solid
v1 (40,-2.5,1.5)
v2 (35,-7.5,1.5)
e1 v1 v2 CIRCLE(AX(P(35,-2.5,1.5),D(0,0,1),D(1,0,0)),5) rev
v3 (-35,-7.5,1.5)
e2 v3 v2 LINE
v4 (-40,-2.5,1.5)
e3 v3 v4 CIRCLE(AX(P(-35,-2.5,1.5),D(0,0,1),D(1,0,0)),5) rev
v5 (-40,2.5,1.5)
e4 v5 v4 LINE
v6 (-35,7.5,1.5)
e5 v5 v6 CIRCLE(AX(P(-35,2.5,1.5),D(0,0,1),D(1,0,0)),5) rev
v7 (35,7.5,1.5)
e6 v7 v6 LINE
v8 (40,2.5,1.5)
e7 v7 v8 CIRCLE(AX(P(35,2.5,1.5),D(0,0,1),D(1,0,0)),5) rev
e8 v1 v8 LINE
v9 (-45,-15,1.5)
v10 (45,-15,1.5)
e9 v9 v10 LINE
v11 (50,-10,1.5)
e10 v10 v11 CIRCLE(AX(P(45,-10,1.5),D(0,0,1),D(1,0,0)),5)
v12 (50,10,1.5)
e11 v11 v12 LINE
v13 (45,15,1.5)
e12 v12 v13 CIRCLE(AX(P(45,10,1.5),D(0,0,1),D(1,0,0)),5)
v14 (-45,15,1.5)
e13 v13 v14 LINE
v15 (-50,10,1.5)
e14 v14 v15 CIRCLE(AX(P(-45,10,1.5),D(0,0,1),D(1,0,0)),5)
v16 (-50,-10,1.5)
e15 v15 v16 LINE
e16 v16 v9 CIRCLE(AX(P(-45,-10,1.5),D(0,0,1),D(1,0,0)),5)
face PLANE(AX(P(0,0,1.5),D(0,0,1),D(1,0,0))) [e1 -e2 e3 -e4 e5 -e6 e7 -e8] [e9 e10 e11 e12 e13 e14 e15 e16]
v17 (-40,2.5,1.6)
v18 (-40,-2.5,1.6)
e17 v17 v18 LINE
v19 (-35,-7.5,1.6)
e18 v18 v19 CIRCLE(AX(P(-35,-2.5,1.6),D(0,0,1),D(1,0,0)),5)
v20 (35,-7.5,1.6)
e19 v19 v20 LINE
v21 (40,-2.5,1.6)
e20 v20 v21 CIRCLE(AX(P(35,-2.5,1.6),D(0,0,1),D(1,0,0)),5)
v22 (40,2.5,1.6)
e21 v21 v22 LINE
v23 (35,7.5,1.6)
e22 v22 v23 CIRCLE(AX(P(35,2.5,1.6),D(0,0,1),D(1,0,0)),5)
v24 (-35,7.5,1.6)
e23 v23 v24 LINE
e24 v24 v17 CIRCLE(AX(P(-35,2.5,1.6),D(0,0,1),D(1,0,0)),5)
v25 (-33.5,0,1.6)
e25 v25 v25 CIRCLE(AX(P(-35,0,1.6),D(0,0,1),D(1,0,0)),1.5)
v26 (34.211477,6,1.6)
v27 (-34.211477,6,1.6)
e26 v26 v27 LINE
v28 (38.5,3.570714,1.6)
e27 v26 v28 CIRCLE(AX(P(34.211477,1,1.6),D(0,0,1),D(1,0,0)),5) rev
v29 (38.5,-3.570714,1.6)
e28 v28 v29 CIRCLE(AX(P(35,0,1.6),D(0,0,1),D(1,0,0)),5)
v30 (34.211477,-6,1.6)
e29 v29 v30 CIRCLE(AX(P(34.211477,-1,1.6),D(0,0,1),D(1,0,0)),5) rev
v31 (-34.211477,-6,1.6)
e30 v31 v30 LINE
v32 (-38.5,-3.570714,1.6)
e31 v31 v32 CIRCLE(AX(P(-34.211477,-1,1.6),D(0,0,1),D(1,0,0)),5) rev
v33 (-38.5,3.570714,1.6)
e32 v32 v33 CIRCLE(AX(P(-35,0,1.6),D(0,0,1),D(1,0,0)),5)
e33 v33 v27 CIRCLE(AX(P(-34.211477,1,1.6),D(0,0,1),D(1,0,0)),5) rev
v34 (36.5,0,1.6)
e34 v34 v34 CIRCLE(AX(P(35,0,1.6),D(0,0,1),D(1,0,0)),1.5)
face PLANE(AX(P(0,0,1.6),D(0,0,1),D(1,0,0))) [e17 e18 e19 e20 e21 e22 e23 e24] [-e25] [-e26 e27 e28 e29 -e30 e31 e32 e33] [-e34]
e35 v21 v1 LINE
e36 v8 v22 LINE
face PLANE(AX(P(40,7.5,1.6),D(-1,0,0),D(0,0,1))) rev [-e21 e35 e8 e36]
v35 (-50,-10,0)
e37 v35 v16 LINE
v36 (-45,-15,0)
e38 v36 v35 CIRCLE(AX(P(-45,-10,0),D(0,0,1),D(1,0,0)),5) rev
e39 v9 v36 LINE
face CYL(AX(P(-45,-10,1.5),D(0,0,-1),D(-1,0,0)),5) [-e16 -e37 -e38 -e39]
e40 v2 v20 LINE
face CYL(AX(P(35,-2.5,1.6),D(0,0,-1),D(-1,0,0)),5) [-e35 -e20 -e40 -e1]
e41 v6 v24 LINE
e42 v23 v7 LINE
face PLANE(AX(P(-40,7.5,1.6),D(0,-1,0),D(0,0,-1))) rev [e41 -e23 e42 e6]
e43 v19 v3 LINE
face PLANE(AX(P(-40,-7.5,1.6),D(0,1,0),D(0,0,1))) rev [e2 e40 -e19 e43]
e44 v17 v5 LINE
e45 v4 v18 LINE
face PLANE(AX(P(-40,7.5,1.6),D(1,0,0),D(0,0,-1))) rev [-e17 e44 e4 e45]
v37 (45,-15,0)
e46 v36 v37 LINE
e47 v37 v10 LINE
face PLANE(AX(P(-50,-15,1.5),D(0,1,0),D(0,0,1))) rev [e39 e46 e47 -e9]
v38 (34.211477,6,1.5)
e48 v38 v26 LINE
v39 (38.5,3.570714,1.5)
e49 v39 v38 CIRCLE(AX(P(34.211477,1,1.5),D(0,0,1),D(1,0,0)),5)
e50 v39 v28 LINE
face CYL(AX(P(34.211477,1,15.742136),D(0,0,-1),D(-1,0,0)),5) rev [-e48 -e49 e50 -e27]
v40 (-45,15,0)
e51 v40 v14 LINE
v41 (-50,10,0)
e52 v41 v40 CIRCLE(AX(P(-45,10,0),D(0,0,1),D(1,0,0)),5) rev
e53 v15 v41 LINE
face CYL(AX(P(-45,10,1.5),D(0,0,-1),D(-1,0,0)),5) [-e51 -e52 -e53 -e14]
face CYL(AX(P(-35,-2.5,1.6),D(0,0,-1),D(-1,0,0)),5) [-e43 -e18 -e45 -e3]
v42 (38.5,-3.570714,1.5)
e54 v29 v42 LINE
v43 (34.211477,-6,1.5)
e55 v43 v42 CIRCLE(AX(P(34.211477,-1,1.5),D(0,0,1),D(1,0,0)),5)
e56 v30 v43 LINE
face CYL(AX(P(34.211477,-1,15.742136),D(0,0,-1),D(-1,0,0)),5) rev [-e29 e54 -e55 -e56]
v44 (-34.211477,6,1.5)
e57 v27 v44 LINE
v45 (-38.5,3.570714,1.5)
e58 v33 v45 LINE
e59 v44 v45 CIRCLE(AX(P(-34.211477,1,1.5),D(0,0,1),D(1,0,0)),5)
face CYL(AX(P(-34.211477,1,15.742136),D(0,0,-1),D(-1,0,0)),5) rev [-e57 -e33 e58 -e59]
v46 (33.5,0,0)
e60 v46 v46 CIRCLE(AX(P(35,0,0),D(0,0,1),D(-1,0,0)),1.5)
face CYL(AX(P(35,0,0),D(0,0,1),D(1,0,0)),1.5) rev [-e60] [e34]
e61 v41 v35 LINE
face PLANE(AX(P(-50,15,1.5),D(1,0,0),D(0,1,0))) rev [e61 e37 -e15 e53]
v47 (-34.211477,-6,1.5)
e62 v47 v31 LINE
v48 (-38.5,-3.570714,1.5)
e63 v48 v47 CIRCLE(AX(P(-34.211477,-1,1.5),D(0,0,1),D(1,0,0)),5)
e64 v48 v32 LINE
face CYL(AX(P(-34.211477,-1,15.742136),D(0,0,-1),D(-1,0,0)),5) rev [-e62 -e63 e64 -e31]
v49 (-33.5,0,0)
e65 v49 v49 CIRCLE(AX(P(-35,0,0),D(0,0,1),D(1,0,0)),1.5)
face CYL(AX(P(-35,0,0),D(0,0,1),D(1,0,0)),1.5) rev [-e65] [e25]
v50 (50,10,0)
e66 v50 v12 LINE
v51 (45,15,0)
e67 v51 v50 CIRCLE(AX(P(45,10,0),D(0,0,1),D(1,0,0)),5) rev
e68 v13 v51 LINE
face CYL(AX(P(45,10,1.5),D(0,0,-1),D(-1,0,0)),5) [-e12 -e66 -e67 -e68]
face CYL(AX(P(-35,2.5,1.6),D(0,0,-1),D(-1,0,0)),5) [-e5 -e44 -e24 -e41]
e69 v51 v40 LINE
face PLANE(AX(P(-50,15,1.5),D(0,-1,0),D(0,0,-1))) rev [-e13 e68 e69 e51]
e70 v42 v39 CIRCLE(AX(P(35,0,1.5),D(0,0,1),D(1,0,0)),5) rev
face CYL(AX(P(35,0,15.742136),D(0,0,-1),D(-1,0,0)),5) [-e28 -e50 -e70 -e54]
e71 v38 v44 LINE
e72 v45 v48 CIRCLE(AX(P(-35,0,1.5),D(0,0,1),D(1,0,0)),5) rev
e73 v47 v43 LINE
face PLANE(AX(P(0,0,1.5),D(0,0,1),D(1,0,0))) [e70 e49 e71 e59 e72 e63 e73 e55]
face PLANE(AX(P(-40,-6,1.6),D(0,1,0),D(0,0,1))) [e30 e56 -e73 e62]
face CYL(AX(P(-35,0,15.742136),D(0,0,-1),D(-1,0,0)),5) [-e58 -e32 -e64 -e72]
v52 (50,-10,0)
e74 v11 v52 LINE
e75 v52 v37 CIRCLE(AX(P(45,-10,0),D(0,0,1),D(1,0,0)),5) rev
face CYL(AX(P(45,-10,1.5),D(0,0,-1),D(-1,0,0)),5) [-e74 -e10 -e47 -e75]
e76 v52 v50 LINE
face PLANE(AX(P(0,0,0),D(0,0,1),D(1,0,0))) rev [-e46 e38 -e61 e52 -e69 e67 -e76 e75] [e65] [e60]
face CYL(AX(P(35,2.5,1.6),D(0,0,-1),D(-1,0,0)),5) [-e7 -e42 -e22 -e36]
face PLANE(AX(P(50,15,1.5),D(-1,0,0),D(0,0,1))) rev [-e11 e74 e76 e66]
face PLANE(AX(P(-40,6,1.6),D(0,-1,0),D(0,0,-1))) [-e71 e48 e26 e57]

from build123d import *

# Parameters (mm, degrees)
SKETCH1_W               = 100
SKETCH1_H               = 30
BOSS_EXTRUDE1_DEPTH     = 1.5
SKETCH2_W               = 80
SKETCH2_H               = 15
SKETCH2_W_2             = 77
SKETCH2_H_2             = 12
EXTRUDE_THIN1_DEPTH     = 0.1
SKETCH3_R               = 5
BOSS_EXTRUDE2_DEPTH     = 0.1
CUT_EXTRUDE1_DEPTH      = 53.226047141
CUT_EXTRUDE1_DEPTH_BACK = 53.226047141
SKETCH4_R               = 1.5
FILLET1_R               = 5


with BuildPart() as part:
    # Sketch1 → Boss-Extrude1 (new body)
    with BuildSketch(Plane.XY):
        Rectangle(SKETCH1_W, SKETCH1_H)
    extrude(amount=BOSS_EXTRUDE1_DEPTH)

    # Sketch2 → Extrude-Thin1 (add)
    with BuildSketch(Plane.XY.offset(1.5)):
        Rectangle(SKETCH2_W, SKETCH2_H)
        Rectangle(SKETCH2_W_2, SKETCH2_H_2, mode=Mode.SUBTRACT)
    extrude(amount=EXTRUDE_THIN1_DEPTH)

    # Sketch3 → Boss-Extrude2 (add)
    with BuildSketch(Plane.XY.offset(1.5)):
        with Locations((-35, 0)):
            Circle(SKETCH3_R)
        with Locations((35, 0)):
            Circle(SKETCH3_R)
    extrude(amount=BOSS_EXTRUDE2_DEPTH)

    # Sketch4 → Cut-Extrude1 (cut, two sides: drawn at the far end of the back side and taken through both)
    with BuildSketch(Plane.XY.offset(1.6).offset(-CUT_EXTRUDE1_DEPTH_BACK)):
        with Locations((-35, 0)):
            Circle(SKETCH4_R)
        with Locations((35, 0)):
            Circle(SKETCH4_R)
    extrude(amount=CUT_EXTRUDE1_DEPTH + CUT_EXTRUDE1_DEPTH_BACK, mode=Mode.SUBTRACT)

    # Fillet1
    # the kernel refuses this fillet: 5 mm, written as the material it adds along each edge
    with BuildSketch(Plane(origin=(38.5, -6, 1.5), x_dir=(0, 1, 0), z_dir=(0, 0, 1))) as fillet1_piece_1:
        with BuildLine():
            CenterArc((5, 4.288522873), FILLET1_R, 180, 59.059821395)
            Line((0, 4.288522873), (0, 0))
            Line((0, 0), (2.429285786, 0))
        make_face()
    extrude(amount=0.1)
    with BuildSketch(Plane(origin=(38.5, 6, 1.5), x_dir=(0, -1, 0), z_dir=(0, 0, 1))) as fillet1_piece_2:
        with BuildLine():
            CenterArc((5, -4.288522873), FILLET1_R, 120.940178605, 59.059821395)
            Line((0, -4.288522873), (0, 0))
            Line((0, 0), (2.429285786, 0))
        make_face()
    extrude(amount=0.1)
    with BuildSketch(Plane(origin=(-38.5, -6, 1.5), x_dir=(1, 0, 0), z_dir=(0, 0, 1))) as fillet1_piece_3:
        with BuildLine():
            CenterArc((4.288522873, 5), FILLET1_R, 210.940178605, 59.059821395)
            Line((0, 2.429285786), (0, 0))
            Line((0, 0), (4.288522873, 0))
        make_face()
    extrude(amount=0.1)
    with BuildSketch(Plane(origin=(-38.5, 6, 1.5), x_dir=(1, 0, 0), z_dir=(0, 0, 1))) as fillet1_piece_4:
        with BuildLine():
            CenterArc((4.288522873, -5), FILLET1_R, 90, 59.059821395)
            Line((0, -2.429285786), (0, 0))
            Line((0, 0), (4.288522873, 0))
        make_face()
    extrude(amount=0.1)
    # the kernel refuses this fillet: 5 mm, written as the material it takes off along each edge
    with BuildSketch(Plane(origin=(40, 7.5, 1.5), x_dir=(0, -1, 0), z_dir=(0, 0, 1)), Plane(origin=(40, -7.5, 1.5), x_dir=(-1, 0, 0), z_dir=(0, 0, 1)), Plane(origin=(-40, 7.5, 1.5), x_dir=(1, 0, 0), z_dir=(0, 0, 1))) as fillet1_2_piece_1:
        with BuildLine():
            CenterArc((FILLET1_R, -FILLET1_R), FILLET1_R, 90, 90)
            Line((0, -FILLET1_R), (0, 0))
            Line((0, 0), (FILLET1_R, 0))
        make_face()
    extrude(amount=12.6, mode=Mode.SUBTRACT)
    with BuildSketch(Plane(origin=(-40, -7.5, 1.5), x_dir=(1, 0, 0), z_dir=(0, 0, 1))) as fillet1_2_piece_2:
        with BuildLine():
            CenterArc((FILLET1_R, FILLET1_R), FILLET1_R, 180, 90)
            Line((0, FILLET1_R), (0, 0))
            Line((0, 0), (FILLET1_R, 0))
        make_face()
    extrude(amount=12.6, mode=Mode.SUBTRACT)
    with BuildSketch(Plane(origin=(-50, 15, -12.5), x_dir=(1, 0, 0), z_dir=(0, 0, 1)), Plane(origin=(-50, -15, -12.5), x_dir=(0, 1, 0), z_dir=(0, 0, 1))) as fillet1_2_piece_3:
        with BuildLine():
            CenterArc((FILLET1_R, -FILLET1_R), FILLET1_R, 90, 90)
            Line((0, -FILLET1_R), (0, 0))
            Line((0, 0), (FILLET1_R, 0))
        make_face()
    extrude(amount=26.5, mode=Mode.SUBTRACT)
    with BuildSketch(Plane(origin=(50, -15, -12.5), x_dir=(0, 1, 0), z_dir=(0, 0, 1)), Plane(origin=(50, 15, -12.5), x_dir=(-1, 0, 0), z_dir=(0, 0, 1))) as fillet1_2_piece_4:
        with BuildLine():
            CenterArc((FILLET1_R, FILLET1_R), FILLET1_R, 180, 90)
            Line((0, FILLET1_R), (0, 0))
            Line((0, 0), (FILLET1_R, 0))
        make_face()
    extrude(amount=26.5, mode=Mode.SUBTRACT)


solid = part.part
